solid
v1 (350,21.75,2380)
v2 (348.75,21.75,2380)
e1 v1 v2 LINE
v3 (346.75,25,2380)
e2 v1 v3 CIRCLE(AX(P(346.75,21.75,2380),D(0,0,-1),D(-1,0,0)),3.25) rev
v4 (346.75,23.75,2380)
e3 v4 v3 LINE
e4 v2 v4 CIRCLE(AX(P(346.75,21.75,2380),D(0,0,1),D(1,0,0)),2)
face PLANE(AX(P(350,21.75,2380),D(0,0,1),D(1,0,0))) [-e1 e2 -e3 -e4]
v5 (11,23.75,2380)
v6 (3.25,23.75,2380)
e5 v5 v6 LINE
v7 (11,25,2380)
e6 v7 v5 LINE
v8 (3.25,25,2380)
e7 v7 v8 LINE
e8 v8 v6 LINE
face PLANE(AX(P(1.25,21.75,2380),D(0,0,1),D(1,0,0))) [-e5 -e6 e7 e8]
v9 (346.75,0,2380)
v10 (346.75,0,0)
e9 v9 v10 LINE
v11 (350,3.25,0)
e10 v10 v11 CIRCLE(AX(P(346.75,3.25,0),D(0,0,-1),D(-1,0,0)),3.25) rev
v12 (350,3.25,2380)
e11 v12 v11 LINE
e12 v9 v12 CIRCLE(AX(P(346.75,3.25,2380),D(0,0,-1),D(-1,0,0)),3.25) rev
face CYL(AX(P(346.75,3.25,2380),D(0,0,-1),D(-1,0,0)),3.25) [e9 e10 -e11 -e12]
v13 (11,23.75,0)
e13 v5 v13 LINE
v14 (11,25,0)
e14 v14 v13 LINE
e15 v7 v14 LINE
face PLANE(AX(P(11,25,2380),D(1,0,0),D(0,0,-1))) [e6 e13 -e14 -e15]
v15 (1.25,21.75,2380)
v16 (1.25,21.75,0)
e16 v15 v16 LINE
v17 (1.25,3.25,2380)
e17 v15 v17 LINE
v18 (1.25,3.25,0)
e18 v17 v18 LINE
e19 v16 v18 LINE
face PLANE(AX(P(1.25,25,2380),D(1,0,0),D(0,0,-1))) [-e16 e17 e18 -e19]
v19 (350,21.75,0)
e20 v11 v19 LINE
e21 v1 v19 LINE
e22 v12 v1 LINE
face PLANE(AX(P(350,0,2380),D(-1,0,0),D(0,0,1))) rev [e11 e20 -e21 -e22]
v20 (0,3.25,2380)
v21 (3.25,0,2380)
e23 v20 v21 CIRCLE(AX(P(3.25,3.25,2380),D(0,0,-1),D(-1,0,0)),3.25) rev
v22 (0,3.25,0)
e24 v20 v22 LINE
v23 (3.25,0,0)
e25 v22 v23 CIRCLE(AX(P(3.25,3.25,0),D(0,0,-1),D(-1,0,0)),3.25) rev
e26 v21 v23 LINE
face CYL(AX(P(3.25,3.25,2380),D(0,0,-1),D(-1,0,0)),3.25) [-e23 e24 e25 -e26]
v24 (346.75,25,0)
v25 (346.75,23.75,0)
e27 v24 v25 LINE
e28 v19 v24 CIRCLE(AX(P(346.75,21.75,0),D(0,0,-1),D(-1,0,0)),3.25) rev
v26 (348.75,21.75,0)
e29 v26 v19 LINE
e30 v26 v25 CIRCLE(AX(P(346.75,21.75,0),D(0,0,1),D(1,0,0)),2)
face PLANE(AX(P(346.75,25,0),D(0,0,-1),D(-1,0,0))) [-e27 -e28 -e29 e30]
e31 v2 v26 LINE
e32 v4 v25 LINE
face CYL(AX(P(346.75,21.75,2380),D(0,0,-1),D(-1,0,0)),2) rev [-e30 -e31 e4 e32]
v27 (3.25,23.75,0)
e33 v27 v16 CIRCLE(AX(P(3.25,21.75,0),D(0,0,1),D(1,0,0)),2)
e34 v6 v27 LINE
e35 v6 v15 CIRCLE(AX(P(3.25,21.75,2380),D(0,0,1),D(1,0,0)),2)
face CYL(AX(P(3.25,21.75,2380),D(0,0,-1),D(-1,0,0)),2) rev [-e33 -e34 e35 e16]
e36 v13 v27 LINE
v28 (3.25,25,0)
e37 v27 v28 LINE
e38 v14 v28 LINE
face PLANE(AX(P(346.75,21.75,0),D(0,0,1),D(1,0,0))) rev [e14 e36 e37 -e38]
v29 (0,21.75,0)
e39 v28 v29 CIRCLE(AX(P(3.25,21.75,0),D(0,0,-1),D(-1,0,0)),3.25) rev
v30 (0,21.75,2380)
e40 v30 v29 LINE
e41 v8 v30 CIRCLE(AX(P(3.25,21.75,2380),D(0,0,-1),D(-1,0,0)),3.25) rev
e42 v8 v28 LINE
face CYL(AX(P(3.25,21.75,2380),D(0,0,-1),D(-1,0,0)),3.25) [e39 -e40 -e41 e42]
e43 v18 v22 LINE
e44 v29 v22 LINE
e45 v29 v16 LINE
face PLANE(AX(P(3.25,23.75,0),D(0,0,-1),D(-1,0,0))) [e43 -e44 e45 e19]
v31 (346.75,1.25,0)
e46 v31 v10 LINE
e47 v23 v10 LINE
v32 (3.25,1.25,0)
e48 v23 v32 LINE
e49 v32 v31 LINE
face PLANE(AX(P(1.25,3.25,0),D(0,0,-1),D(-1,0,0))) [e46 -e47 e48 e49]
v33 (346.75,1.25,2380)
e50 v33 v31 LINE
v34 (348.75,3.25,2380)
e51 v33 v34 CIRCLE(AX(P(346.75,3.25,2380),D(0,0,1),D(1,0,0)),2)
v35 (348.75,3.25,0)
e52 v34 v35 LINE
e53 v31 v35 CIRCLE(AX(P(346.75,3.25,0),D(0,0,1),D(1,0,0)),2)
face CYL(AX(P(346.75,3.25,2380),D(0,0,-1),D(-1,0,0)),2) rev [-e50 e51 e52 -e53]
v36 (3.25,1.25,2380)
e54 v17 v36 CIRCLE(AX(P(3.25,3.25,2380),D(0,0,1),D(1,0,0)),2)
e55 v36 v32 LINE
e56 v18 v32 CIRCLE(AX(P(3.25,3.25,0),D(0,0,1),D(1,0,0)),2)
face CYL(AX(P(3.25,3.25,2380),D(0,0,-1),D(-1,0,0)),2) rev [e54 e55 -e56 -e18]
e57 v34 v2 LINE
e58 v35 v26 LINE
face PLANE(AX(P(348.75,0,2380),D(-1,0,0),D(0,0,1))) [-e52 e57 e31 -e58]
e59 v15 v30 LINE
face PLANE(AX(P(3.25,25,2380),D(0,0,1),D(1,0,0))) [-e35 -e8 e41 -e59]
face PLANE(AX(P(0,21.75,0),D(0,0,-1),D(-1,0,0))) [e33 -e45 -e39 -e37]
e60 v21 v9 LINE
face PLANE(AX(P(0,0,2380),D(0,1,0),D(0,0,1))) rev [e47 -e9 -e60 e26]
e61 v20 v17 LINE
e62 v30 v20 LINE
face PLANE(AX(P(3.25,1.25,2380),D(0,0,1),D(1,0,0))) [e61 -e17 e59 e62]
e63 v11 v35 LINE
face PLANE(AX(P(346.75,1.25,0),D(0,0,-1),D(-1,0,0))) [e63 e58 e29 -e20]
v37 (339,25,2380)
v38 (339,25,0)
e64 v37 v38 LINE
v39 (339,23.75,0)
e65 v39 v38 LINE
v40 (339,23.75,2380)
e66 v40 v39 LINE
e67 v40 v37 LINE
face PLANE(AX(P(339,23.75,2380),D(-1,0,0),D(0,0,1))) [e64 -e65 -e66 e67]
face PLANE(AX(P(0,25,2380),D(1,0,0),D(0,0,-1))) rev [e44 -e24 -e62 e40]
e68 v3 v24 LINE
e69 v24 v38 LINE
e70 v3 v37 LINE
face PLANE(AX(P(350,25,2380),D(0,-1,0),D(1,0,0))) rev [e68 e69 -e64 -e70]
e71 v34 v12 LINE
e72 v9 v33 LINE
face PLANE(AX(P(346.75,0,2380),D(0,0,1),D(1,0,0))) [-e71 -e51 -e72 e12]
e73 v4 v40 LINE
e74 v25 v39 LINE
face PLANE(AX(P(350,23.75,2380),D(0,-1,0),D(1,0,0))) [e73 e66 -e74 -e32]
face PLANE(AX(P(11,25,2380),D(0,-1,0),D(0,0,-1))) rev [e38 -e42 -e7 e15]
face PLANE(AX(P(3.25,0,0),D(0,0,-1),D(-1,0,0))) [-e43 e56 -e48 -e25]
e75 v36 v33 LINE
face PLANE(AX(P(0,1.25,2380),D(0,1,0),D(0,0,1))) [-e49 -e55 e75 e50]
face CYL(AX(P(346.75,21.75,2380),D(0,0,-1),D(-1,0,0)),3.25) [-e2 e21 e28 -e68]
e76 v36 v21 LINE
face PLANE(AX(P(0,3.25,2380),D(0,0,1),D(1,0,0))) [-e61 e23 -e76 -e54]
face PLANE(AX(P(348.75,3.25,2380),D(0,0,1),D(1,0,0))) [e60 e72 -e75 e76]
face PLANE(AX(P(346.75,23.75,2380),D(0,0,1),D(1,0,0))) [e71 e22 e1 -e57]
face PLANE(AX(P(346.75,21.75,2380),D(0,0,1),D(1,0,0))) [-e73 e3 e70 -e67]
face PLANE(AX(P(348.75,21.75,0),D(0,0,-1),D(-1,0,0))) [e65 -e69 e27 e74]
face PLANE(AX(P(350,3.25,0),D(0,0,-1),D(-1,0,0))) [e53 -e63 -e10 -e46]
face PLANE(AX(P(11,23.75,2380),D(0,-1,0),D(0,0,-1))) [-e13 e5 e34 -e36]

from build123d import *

# Parameters (mm, degrees)
BASE_FLANGE1_DEPTH = 2380


# Sheet-metal steps are written as plain solids
with BuildPart() as part:
    # Sketch1 → Base-Flange1 (new body)
    with BuildSketch(Plane.XY):
        with BuildLine():
            Line((11, 25), (3.25, 25))
            ThreePointArc((3.25, 25), (0.951902961, 24.048097039), (0, 21.75))
            Line((0, 21.75), (0, 3.25))
            ThreePointArc((0, 3.25), (0.951902961, 0.951902961), (3.25, 0))
            Line((3.25, 0), (346.75, 0))
            ThreePointArc((346.75, 0), (349.048097039, 0.951902961), (350, 3.25))
            Line((350, 3.25), (350, 21.75))
            ThreePointArc((350, 21.75), (349.048097039, 24.048097039), (346.75, 25))
            Line((346.75, 25), (339, 25))
            Line((339, 25), (339, 23.75))
            Line((339, 23.75), (346.75, 23.75))
            ThreePointArc((346.75, 23.75), (348.164213562, 23.164213562), (348.75, 21.75))
            Line((348.75, 21.75), (348.75, 3.25))
            ThreePointArc((348.75, 3.25), (348.164213562, 1.835786438), (346.75, 1.25))
            Line((346.75, 1.25), (3.25, 1.25))
            ThreePointArc((3.25, 1.25), (1.835786438, 1.835786438), (1.25, 3.25))
            Line((1.25, 3.25), (1.25, 21.75))
            ThreePointArc((1.25, 21.75), (1.835786438, 23.164213562), (3.25, 23.75))
            Line((3.25, 23.75), (11, 23.75))
            Line((11, 23.75), (11, 25))
        make_face()
    extrude(amount=BASE_FLANGE1_DEPTH)


solid = part.part
